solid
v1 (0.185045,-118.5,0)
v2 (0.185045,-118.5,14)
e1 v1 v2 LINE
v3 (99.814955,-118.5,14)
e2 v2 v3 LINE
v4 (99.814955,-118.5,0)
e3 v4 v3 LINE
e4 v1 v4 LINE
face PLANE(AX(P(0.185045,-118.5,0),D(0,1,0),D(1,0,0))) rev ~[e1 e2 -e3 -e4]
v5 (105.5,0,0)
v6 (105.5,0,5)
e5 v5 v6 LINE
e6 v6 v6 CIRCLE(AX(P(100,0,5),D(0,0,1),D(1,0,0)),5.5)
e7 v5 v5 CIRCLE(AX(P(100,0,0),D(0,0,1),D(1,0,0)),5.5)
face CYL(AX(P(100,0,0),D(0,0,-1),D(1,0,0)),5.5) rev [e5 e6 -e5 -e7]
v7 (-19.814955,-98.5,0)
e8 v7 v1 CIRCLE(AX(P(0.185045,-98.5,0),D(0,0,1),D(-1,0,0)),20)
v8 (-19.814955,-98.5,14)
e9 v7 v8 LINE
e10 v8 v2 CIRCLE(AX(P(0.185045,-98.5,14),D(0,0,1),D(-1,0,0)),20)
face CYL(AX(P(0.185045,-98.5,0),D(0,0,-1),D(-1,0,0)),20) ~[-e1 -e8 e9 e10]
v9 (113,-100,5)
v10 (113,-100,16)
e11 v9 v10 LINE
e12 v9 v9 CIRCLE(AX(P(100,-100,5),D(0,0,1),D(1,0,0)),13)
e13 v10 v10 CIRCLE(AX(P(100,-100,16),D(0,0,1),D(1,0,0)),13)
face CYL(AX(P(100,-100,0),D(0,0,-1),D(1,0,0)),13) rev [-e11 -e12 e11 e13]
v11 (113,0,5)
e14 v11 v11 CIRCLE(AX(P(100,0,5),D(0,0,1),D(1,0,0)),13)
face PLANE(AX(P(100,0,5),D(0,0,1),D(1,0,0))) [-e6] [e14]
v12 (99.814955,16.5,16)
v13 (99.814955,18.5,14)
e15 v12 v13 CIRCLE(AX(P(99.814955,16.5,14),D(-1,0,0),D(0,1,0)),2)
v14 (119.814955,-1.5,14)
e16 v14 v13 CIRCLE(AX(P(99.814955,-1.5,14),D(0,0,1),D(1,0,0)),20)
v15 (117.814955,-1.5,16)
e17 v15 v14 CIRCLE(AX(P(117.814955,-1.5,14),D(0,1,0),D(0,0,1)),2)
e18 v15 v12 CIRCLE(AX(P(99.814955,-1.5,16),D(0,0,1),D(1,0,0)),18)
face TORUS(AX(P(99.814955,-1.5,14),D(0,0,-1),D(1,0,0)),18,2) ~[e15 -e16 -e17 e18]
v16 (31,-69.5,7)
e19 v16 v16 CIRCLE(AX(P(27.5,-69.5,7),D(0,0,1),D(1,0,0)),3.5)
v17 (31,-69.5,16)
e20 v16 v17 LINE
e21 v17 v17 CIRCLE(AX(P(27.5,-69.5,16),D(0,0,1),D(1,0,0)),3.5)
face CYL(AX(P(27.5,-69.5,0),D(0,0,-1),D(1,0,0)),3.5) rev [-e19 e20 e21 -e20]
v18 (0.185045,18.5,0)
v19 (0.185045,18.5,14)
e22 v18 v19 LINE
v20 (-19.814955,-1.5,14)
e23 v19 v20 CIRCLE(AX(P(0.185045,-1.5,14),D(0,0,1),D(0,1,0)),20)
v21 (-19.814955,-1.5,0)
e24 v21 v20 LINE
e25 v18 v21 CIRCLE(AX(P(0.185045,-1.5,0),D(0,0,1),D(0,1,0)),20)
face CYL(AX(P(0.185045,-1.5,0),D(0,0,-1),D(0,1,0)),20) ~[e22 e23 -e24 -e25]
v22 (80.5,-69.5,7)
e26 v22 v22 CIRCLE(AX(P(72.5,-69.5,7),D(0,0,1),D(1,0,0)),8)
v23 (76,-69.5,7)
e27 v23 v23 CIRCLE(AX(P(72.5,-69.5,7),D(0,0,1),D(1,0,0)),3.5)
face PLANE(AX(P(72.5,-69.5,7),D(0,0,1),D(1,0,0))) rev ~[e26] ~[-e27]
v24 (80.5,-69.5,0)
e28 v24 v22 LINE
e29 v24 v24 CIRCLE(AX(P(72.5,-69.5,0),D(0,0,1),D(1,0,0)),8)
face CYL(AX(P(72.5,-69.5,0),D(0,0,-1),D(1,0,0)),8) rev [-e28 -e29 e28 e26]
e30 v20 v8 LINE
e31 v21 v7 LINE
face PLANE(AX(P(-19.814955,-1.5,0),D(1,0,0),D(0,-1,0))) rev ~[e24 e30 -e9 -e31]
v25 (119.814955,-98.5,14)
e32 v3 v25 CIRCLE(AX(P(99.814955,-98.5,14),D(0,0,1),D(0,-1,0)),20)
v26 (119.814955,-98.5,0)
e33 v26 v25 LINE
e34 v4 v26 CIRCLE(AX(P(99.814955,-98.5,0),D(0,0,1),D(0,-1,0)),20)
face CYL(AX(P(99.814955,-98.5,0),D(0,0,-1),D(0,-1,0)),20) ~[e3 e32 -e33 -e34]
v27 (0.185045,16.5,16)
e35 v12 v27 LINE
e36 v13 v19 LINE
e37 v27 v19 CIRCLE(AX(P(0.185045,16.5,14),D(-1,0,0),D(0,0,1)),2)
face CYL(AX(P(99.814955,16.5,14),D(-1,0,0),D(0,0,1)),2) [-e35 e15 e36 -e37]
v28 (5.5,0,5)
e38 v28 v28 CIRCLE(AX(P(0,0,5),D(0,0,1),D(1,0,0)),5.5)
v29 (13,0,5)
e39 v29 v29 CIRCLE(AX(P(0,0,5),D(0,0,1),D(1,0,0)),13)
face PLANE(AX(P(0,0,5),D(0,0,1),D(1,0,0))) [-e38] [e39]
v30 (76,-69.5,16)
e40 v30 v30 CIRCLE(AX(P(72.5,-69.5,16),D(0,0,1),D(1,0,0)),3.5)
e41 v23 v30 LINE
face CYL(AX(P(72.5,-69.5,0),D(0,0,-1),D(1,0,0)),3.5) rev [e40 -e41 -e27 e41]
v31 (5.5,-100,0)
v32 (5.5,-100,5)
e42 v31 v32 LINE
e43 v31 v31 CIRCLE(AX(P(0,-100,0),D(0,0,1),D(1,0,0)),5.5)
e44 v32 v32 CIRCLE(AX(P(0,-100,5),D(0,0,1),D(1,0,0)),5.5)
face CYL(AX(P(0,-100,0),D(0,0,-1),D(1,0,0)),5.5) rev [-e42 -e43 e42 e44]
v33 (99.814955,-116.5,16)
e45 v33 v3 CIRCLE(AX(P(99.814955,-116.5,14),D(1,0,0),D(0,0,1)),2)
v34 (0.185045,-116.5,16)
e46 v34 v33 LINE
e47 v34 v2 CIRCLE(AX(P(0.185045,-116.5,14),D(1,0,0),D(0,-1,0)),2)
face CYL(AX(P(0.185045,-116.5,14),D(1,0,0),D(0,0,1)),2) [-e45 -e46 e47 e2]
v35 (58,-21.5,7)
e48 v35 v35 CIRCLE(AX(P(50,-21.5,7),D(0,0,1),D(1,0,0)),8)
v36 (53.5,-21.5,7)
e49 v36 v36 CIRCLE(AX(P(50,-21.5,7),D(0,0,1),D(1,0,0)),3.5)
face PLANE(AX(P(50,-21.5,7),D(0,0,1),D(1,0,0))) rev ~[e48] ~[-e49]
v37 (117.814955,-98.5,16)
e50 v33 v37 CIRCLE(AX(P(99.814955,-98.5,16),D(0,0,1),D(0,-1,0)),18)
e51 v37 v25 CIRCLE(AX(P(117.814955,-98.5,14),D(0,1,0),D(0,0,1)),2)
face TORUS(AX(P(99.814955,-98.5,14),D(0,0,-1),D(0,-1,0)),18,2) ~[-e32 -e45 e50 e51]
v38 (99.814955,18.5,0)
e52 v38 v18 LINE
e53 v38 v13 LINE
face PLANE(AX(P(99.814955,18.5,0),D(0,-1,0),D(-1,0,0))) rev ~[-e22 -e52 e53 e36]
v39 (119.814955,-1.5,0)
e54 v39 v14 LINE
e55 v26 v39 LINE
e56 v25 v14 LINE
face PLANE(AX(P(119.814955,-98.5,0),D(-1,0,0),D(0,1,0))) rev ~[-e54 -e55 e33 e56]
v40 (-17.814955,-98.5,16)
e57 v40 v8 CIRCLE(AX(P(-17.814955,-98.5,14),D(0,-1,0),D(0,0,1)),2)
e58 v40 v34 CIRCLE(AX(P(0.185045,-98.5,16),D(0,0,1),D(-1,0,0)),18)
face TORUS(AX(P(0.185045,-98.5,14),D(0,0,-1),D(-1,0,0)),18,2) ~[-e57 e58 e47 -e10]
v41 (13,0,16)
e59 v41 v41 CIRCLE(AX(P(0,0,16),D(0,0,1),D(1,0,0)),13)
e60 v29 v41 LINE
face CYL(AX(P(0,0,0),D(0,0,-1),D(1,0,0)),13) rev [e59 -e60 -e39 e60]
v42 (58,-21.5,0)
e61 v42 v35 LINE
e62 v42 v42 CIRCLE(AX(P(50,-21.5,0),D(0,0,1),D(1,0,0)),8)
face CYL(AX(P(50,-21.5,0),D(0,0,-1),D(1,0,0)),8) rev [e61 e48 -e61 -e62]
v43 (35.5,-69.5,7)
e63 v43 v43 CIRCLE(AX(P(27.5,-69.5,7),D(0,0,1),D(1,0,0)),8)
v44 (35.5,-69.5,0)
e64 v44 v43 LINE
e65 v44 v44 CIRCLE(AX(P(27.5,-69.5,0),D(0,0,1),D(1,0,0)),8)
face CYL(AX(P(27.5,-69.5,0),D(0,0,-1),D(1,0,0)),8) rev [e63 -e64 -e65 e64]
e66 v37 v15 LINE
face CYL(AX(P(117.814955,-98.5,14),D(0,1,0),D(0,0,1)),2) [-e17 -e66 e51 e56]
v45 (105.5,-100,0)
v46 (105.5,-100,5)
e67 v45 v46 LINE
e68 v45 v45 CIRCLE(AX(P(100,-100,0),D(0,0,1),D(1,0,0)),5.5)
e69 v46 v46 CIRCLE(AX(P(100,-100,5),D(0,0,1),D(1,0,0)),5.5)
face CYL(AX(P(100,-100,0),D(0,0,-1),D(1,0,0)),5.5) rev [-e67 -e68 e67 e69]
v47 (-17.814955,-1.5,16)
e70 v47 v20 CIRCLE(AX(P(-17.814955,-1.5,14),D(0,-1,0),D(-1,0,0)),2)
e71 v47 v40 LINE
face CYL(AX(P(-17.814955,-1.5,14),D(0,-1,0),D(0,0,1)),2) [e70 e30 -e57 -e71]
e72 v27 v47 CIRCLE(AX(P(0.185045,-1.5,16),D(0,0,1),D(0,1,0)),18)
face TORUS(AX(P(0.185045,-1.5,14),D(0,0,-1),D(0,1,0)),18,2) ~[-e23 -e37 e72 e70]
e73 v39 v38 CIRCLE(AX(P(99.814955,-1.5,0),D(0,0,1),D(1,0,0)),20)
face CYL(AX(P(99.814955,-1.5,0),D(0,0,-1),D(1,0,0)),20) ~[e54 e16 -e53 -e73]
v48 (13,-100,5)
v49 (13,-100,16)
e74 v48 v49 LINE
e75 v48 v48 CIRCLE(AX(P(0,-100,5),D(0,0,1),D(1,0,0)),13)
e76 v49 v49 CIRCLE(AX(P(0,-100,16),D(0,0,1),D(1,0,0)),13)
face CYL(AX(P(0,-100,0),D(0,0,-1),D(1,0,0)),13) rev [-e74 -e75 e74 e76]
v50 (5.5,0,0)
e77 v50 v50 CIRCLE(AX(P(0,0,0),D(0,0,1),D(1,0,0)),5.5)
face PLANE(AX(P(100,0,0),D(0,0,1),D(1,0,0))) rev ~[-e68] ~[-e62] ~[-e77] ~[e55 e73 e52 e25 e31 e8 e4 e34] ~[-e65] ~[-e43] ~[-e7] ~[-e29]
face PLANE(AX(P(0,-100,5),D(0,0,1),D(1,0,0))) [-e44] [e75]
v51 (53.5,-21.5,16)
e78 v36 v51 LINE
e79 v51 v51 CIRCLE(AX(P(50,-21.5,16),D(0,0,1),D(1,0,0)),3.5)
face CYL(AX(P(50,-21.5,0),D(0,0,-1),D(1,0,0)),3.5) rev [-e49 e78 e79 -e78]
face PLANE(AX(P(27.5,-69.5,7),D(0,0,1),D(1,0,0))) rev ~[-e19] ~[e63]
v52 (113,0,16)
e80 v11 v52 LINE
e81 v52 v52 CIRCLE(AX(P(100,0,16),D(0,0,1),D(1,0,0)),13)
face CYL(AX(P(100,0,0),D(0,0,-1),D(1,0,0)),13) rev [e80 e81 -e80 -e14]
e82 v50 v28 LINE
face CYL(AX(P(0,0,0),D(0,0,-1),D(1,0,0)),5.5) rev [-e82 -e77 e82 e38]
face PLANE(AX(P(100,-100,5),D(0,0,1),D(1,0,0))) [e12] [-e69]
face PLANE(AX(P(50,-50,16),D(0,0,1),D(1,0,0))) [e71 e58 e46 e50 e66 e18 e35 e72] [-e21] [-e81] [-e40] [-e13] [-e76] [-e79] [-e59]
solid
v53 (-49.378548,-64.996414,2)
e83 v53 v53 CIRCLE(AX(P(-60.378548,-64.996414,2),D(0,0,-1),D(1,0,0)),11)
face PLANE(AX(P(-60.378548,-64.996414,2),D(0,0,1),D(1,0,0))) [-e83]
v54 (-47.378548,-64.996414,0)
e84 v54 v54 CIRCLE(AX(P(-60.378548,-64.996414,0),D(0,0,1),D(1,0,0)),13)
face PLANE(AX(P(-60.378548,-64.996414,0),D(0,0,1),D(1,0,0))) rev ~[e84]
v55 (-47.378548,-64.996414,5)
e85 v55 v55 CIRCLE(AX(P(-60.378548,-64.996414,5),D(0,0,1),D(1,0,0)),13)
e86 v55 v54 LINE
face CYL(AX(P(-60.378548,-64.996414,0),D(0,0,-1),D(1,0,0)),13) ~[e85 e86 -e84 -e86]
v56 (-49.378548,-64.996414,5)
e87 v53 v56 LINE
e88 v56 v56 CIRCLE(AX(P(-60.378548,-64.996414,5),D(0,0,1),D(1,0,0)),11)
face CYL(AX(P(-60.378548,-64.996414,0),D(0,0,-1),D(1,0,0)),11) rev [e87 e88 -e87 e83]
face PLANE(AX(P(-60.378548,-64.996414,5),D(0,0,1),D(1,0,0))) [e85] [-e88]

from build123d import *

# Parameters (mm, degrees)
F0_R     = 13
F0_R_2   = 8
F0_R_3   = 3.5
F1_DEPTH = 16
F2_DEPTH = 7
F3_DEPTH = 16
F4_R     = 2
F0_R_4   = 5.5
F5_DEPTH = 5
F0_R_5   = 11
F6_DEPTH = 2
F7_DEPTH = 5


# Not quite as in the source:
# - a feature names something its author has since deleted; it is built from what else it names


with BuildPart() as f1:
    # F0 (on Top) → F1 (new body)
    with BuildSketch(Plane.XY):
        with BuildLine():
            Line((99.8149545762, 18.5), (0.1850454238, 18.5))
            ThreePointArc((0.1850454238, 18.5), (-13.9570902, 12.6421356237), (-19.8149545762, -1.5))
            Line((-19.8149545762, -1.5), (-19.8149545762, -98.5))
            ThreePointArc((-19.8149545762, -98.5), (-13.9570902, -112.6421356237), (0.1850454238, -118.5))
            Line((0.1850454238, -118.5), (99.8149545762, -118.5))
            ThreePointArc((99.8149545762, -118.5), (113.9570902, -112.6421356237), (119.8149545762, -98.5))
            Line((119.8149545762, -98.5), (119.8149545762, -1.5))
            ThreePointArc((119.8149545762, -1.5), (113.9570902, 12.6421356237), (99.8149545762, 18.5))
        make_face()
        with Locations((0, -100)):
            Circle(F0_R, mode=Mode.SUBTRACT)
        with Locations((100, -100)):
            Circle(F0_R, mode=Mode.SUBTRACT)
        with Locations((27.5, -69.5)):
            Circle(F0_R_2, mode=Mode.SUBTRACT)
        with Locations((72.5, -69.5)):
            Circle(F0_R_2, mode=Mode.SUBTRACT)
        Circle(F0_R, mode=Mode.SUBTRACT)
        with Locations((50, -21.5)):
            Circle(F0_R_2, mode=Mode.SUBTRACT)
        with Locations((100, 0)):
            Circle(F0_R, mode=Mode.SUBTRACT)
        with Locations((50, -21.5)):
            Circle(F0_R_2)
        with Locations((50, -21.5)):
            Circle(F0_R_3, mode=Mode.SUBTRACT)
        with Locations((72.5, -69.5)):
            Circle(F0_R_2)
        with Locations((72.5, -69.5)):
            Circle(F0_R_3, mode=Mode.SUBTRACT)
        with Locations((27.5, -69.5)):
            Circle(F0_R_2)
        with Locations((27.5, -69.5)):
            Circle(F0_R_3, mode=Mode.SUBTRACT)
        with Locations((50, -21.5)):
            Circle(F0_R_3)
        with Locations((72.5, -69.5)):
            Circle(F0_R_3)
        with Locations((27.5, -69.5)):
            Circle(F0_R_3)
    extrude(amount=F1_DEPTH)

    # F0 (on Top) → F2 (cut)
    with BuildSketch(Plane.XY):
        with Locations((72.5, -69.5)):
            Circle(F0_R_2)
        with Locations((72.5, -69.5)):
            Circle(F0_R_3, mode=Mode.SUBTRACT)
        with Locations((27.5, -69.5)):
            Circle(F0_R_2)
        with Locations((27.5, -69.5)):
            Circle(F0_R_3, mode=Mode.SUBTRACT)
        with Locations((50, -21.5)):
            Circle(F0_R_2)
        with Locations((50, -21.5)):
            Circle(F0_R_3, mode=Mode.SUBTRACT)
    extrude(amount=F2_DEPTH, mode=Mode.SUBTRACT)

    # F0 (on Top) → F3 (cut, through all)
    with BuildSketch(Plane.XY):
        with Locations((27.5, -69.5)):
            Circle(F0_R_3)
        with Locations((72.5, -69.5)):
            Circle(F0_R_3)
        with Locations((50, -21.5)):
            Circle(F0_R_3)
    extrude(amount=F3_DEPTH, mode=Mode.SUBTRACT)

    # F4
    f4_edges = [f1.edges().sort_by_distance(p)[0] for p in [
        (119.814955, -50, 16),
    ]]
    fillet(f4_edges, radius=F4_R)

    # F0 (on Top) → F5 (join)
    with BuildSketch(Plane.XY):
        with Locations((100, 0)):
            Circle(F0_R)
        with Locations((100, 0)):
            Circle(F0_R_4, mode=Mode.SUBTRACT)
        with Locations((100, -100)):
            Circle(F0_R)
        with Locations((100, -100)):
            Circle(F0_R_4, mode=Mode.SUBTRACT)
        with Locations((0, -100)):
            Circle(F0_R)
        with Locations((0, -100)):
            Circle(F0_R_4, mode=Mode.SUBTRACT)
        Circle(F0_R)
        Circle(F0_R_4, mode=Mode.SUBTRACT)
    extrude(amount=F5_DEPTH)


with BuildPart() as f6:
    # F0 (on Top) → F6 (new body)
    with BuildSketch(Plane.XY):
        with Locations((-60.3785477579, -64.9964138865)):
            Circle(F0_R)
        with Locations((-60.3785477579, -64.9964138865)):
            Circle(F0_R_5, mode=Mode.SUBTRACT)
        with Locations((-60.3785477579, -64.9964138865)):
            Circle(F0_R_5)
    extrude(amount=F6_DEPTH)

    # F0 (on Top) → F7 (join)
    with BuildSketch(Plane.XY):
        with Locations((-60.3785477579, -64.9964138865)):
            Circle(F0_R)
        with Locations((-60.3785477579, -64.9964138865)):
            Circle(F0_R_5, mode=Mode.SUBTRACT)
    extrude(amount=F7_DEPTH)


solid = Compound([f1.part, f6.part])
